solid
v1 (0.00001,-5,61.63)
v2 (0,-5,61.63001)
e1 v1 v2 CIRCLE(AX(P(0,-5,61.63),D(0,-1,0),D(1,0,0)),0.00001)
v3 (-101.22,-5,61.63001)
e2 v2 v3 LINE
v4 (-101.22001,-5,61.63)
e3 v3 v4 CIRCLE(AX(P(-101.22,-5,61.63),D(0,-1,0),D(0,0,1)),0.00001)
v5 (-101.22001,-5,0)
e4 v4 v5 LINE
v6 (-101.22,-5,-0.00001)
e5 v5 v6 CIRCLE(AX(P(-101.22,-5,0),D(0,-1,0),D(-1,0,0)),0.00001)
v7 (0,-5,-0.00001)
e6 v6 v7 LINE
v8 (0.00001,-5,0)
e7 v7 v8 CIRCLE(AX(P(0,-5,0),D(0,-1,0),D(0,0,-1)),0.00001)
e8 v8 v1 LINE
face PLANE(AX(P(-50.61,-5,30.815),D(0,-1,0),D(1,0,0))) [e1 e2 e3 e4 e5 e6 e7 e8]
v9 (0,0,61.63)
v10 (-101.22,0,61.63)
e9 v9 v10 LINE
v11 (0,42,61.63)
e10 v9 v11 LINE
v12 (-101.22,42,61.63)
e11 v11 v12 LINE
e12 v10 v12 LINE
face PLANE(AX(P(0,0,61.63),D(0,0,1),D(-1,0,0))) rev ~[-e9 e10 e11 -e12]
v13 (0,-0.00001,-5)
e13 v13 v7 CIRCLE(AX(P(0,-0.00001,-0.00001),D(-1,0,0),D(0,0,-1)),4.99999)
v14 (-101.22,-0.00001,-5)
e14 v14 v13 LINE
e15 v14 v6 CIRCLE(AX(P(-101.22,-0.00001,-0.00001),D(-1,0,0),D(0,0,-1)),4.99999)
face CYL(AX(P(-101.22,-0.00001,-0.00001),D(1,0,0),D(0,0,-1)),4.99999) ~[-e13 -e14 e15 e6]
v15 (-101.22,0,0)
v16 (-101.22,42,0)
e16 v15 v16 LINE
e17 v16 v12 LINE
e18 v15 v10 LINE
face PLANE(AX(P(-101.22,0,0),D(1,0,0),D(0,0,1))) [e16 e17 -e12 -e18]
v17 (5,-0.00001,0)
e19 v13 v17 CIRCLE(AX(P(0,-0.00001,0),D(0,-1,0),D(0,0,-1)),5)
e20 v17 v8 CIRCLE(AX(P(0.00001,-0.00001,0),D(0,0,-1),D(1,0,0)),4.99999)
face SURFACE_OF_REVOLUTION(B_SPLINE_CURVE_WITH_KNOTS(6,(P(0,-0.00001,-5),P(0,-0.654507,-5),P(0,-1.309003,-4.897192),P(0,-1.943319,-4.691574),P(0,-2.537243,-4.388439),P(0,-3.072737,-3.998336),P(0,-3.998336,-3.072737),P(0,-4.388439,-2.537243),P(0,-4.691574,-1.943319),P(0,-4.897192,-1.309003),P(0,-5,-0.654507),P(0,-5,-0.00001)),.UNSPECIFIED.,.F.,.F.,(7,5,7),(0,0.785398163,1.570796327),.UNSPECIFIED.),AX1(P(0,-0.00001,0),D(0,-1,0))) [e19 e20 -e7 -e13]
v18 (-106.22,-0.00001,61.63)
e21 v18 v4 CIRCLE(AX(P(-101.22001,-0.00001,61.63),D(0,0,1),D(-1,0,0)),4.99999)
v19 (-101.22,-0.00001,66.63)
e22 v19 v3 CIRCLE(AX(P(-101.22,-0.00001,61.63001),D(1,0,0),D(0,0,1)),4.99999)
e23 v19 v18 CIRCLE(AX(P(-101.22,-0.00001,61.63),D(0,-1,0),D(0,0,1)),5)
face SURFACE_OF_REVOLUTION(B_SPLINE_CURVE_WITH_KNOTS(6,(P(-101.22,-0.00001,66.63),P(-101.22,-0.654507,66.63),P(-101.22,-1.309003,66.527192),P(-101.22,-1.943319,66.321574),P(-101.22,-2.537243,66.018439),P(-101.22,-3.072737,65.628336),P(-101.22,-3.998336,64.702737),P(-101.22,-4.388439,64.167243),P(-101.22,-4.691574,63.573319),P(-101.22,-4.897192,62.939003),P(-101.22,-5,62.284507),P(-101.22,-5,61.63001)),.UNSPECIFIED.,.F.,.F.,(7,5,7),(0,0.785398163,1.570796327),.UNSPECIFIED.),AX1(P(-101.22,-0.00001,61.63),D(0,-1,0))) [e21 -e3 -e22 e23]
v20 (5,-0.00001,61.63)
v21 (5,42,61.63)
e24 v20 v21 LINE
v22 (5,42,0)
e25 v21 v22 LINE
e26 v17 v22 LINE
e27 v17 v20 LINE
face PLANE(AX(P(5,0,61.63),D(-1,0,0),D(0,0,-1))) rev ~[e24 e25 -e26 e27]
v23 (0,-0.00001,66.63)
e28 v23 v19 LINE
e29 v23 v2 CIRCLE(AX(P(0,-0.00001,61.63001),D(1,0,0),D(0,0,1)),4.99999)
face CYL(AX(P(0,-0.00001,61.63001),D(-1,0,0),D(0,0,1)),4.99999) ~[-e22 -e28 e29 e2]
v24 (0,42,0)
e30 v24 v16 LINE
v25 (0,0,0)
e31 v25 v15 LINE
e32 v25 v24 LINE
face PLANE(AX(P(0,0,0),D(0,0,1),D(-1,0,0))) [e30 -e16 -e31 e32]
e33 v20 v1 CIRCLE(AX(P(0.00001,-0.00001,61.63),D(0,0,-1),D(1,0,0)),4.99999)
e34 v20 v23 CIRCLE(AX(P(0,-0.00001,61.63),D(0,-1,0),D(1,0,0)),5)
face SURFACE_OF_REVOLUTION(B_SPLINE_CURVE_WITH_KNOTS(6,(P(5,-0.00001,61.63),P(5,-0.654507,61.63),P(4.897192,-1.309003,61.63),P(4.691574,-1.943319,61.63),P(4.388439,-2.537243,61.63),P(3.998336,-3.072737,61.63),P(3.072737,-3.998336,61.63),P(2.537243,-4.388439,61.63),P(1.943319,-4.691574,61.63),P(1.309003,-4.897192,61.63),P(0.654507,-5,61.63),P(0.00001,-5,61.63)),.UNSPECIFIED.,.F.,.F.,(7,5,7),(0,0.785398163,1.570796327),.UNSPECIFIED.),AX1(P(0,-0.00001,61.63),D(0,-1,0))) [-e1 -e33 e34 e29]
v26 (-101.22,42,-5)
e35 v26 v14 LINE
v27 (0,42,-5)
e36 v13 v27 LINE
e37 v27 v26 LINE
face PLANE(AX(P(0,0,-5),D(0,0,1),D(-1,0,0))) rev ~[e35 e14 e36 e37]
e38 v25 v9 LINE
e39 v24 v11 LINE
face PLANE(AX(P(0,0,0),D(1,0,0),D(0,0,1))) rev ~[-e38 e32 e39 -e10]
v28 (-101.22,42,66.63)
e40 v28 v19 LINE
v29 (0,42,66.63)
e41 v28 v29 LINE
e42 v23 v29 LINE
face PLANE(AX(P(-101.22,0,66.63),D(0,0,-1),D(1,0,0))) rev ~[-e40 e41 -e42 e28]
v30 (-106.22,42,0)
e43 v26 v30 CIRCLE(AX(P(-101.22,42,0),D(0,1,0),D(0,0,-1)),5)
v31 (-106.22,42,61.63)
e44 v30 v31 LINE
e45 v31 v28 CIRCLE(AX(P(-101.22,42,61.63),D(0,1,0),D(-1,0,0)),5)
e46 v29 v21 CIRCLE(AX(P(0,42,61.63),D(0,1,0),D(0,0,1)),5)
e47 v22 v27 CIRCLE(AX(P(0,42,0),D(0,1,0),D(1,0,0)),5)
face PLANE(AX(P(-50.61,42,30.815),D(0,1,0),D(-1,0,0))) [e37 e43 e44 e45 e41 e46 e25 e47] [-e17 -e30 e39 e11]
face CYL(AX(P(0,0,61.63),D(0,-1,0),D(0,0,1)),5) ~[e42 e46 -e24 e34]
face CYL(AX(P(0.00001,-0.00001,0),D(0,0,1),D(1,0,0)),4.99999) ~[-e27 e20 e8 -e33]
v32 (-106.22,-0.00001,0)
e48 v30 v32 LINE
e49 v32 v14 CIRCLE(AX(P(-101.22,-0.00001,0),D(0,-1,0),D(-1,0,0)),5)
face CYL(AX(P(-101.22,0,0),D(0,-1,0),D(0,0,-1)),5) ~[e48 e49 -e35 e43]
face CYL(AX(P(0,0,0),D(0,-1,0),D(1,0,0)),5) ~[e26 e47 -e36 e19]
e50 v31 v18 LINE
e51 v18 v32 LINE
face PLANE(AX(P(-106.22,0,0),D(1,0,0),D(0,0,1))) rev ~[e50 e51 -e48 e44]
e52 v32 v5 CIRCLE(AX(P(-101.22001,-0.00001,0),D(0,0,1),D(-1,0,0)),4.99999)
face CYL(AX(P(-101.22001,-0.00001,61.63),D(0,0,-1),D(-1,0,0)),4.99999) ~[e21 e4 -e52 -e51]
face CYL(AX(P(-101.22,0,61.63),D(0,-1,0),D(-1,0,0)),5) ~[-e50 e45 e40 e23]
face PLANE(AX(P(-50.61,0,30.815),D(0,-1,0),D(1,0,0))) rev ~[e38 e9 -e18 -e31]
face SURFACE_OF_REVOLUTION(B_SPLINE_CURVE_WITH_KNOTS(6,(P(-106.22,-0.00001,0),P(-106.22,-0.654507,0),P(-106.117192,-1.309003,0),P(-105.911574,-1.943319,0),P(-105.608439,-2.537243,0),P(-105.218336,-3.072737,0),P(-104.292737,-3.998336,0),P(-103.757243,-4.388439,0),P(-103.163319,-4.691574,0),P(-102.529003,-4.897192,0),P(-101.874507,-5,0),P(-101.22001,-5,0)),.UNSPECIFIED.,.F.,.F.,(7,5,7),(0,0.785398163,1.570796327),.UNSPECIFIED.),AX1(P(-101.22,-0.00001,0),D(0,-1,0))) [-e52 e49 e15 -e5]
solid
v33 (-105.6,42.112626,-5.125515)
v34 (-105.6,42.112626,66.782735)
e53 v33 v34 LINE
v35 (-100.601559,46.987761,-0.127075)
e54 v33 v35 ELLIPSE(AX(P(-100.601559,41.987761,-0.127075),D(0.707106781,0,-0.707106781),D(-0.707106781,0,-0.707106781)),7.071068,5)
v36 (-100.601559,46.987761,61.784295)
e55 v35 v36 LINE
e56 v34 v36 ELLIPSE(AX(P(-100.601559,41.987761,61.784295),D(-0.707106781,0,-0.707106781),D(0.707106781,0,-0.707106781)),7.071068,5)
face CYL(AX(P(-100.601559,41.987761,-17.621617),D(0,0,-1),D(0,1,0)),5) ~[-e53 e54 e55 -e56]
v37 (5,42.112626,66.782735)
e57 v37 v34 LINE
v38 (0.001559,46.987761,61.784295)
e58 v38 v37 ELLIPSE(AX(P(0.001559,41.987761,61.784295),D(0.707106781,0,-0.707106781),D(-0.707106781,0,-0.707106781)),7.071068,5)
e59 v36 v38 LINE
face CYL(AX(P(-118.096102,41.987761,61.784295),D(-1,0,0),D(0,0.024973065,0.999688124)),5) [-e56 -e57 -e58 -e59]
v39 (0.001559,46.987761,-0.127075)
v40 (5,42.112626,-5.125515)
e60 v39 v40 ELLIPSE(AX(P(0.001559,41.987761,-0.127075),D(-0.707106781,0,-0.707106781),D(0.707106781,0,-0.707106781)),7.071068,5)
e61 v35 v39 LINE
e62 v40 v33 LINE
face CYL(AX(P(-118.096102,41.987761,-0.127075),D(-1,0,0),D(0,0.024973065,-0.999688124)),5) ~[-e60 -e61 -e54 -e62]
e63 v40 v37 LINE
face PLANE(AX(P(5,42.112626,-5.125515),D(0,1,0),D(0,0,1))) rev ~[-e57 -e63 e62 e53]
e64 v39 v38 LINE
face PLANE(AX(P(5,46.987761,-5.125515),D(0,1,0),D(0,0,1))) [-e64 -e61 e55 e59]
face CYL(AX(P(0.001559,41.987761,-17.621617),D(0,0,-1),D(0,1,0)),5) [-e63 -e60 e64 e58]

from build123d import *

# Parameters (mm, degrees)
F0_W        = 101.22
F0_H        = 61.63
F1_DEPTH    = 5
F2_R        = 4.99999
F3_W        = 101.22
F3_H        = 61.63
F5_DEPTH    = 42
F6_W        = 4.8751346767
F6_H        = 71.9082504511
F7_DEPTH    = 110.6
F8_T1_DEPTH = 96.9004535608
F8_T3_DEPTH = 135.5922031097


# Not quite as in the source:
# - a fillet or chamfer that OpenCascade refuses, or shapes differently, is made with other operations: its cross-section is extruded or revolved along the edge and cut away or added
# - a fillet or chamfer is up to 0.001 mm smaller than in the source, because OpenCascade refuses the exact size


with BuildPart() as f1:
    # F0 (on Front) → F1 (new body)
    with BuildSketch(Plane.XZ):
        with BuildLine():
            Line((0, 66.63), (-101.22, 66.63))
            ThreePointArc((-101.22, 66.63), (-104.7555339059, 65.1655339059), (-106.22, 61.63))
            Line((-106.22, 61.63), (-106.22, 0))
            ThreePointArc((-106.22, 0), (-104.7555339059, -3.5355339059), (-101.22, -5))
            Line((-101.22, -5), (0, -5))
            ThreePointArc((0, -5), (3.5355339059, -3.5355339059), (5, 0))
            Line((5, 0), (5, 61.63))
            ThreePointArc((5, 61.63), (3.5355339059, 65.1655339059), (0, 66.63))
        make_face()
        with Locations((-50.61, 30.815)):
            Rectangle(F0_W, F0_H, mode=Mode.SUBTRACT)
        with Locations((-50.61, 30.815)):
            Rectangle(F0_W, F0_H)
    extrude(amount=F1_DEPTH)

    # F2 (radius 5 in the source; OpenCascade refuses exactly that, so slightly less here)
    f2_edges = [f1.edges().sort_by_distance(p)[0] for p in [
        (-50.61, -5, -5),
    ]]
    fillet(f2_edges, radius=F2_R)

    # F3 (on face) → F5 (join)
    with BuildSketch(Plane(origin=(0, 0, 0), x_dir=(-1, 0, 0), z_dir=(0, 1, 0))):
        with BuildLine():
            Line((101.22, 66.63), (0, 66.63))
            ThreePointArc((0, 66.63), (-3.5355339059, 65.1655339059), (-5, 61.63))
            Line((-5, 61.63), (-5, 0))
            ThreePointArc((-5, 0), (-3.5355339059, -3.5355339059), (0, -5))
            Line((0, -5), (101.22, -5))
            ThreePointArc((101.22, -5), (104.7555339059, -3.5355339059), (106.22, 0))
            Line((106.22, 0), (106.22, 61.63))
            ThreePointArc((106.22, 61.63), (104.7555339059, 65.1655339059), (101.22, 66.63))
        make_face()
        with Locations((50.61, 30.815)):
            Rectangle(F3_W, F3_H, mode=Mode.SUBTRACT)
    extrude(amount=F5_DEPTH)


with BuildPart() as f7:
    # F6 (on face) → F7 (new body)
    with BuildSketch(Plane.YZ.offset(5)):
        with Locations((44.5501934737, 30.8286100626)):
            Rectangle(F6_W, F6_H)
    extrude(amount=-F7_DEPTH)

    # F8: fillet of radius 5 on 4 edges, made by hand

    # F8_s2 → F8_t1 (cut)
    with BuildSketch(Plane.XY.offset(-17.6216167178)):
        with BuildLine():
            ThreePointArc((0.0015593781, 46.987760812), (3.4926676107, 45.5671690464), (5, 42.1126261353))
            Line((5, 42.1126261353), (5, 46.987760812))
            Line((5, 46.987760812), (0.0015593781, 46.987760812))
        make_face()
        with BuildLine():
            ThreePointArc((-100.6015593781, 46.987760812), (-104.0926676107, 45.5671690464), (-105.6, 42.1126261353))
            Line((-105.6, 42.1126261353), (-105.6, 46.987760812))
            Line((-105.6, 46.987760812), (-100.6015593781, 46.987760812))
        make_face()
    extrude(amount=F8_T1_DEPTH, mode=Mode.SUBTRACT)

    # F8_s4 → F8_t3 (cut)
    with BuildSketch(Plane.YZ.offset(-118.0961015548)):
        with BuildLine():
            ThreePointArc((42.1126261353, 66.7827352881), (45.5671690464, 65.2754028988), (46.987760812, 61.7842946662))
            Line((46.987760812, 61.7842946662), (46.987760812, 66.7827352881))
            Line((46.987760812, 66.7827352881), (42.1126261353, 66.7827352881))
        make_face()
        with BuildLine():
            ThreePointArc((42.1126261353, -5.1255151629), (45.5671690464, -3.6181827736), (46.987760812, -0.127074541))
            Line((46.987760812, -0.127074541), (46.987760812, -5.1255151629))
            Line((46.987760812, -5.1255151629), (42.1126261353, -5.1255151629))
        make_face()
    extrude(amount=F8_T3_DEPTH, mode=Mode.SUBTRACT)


solid = Compound([f1.part, f7.part])
